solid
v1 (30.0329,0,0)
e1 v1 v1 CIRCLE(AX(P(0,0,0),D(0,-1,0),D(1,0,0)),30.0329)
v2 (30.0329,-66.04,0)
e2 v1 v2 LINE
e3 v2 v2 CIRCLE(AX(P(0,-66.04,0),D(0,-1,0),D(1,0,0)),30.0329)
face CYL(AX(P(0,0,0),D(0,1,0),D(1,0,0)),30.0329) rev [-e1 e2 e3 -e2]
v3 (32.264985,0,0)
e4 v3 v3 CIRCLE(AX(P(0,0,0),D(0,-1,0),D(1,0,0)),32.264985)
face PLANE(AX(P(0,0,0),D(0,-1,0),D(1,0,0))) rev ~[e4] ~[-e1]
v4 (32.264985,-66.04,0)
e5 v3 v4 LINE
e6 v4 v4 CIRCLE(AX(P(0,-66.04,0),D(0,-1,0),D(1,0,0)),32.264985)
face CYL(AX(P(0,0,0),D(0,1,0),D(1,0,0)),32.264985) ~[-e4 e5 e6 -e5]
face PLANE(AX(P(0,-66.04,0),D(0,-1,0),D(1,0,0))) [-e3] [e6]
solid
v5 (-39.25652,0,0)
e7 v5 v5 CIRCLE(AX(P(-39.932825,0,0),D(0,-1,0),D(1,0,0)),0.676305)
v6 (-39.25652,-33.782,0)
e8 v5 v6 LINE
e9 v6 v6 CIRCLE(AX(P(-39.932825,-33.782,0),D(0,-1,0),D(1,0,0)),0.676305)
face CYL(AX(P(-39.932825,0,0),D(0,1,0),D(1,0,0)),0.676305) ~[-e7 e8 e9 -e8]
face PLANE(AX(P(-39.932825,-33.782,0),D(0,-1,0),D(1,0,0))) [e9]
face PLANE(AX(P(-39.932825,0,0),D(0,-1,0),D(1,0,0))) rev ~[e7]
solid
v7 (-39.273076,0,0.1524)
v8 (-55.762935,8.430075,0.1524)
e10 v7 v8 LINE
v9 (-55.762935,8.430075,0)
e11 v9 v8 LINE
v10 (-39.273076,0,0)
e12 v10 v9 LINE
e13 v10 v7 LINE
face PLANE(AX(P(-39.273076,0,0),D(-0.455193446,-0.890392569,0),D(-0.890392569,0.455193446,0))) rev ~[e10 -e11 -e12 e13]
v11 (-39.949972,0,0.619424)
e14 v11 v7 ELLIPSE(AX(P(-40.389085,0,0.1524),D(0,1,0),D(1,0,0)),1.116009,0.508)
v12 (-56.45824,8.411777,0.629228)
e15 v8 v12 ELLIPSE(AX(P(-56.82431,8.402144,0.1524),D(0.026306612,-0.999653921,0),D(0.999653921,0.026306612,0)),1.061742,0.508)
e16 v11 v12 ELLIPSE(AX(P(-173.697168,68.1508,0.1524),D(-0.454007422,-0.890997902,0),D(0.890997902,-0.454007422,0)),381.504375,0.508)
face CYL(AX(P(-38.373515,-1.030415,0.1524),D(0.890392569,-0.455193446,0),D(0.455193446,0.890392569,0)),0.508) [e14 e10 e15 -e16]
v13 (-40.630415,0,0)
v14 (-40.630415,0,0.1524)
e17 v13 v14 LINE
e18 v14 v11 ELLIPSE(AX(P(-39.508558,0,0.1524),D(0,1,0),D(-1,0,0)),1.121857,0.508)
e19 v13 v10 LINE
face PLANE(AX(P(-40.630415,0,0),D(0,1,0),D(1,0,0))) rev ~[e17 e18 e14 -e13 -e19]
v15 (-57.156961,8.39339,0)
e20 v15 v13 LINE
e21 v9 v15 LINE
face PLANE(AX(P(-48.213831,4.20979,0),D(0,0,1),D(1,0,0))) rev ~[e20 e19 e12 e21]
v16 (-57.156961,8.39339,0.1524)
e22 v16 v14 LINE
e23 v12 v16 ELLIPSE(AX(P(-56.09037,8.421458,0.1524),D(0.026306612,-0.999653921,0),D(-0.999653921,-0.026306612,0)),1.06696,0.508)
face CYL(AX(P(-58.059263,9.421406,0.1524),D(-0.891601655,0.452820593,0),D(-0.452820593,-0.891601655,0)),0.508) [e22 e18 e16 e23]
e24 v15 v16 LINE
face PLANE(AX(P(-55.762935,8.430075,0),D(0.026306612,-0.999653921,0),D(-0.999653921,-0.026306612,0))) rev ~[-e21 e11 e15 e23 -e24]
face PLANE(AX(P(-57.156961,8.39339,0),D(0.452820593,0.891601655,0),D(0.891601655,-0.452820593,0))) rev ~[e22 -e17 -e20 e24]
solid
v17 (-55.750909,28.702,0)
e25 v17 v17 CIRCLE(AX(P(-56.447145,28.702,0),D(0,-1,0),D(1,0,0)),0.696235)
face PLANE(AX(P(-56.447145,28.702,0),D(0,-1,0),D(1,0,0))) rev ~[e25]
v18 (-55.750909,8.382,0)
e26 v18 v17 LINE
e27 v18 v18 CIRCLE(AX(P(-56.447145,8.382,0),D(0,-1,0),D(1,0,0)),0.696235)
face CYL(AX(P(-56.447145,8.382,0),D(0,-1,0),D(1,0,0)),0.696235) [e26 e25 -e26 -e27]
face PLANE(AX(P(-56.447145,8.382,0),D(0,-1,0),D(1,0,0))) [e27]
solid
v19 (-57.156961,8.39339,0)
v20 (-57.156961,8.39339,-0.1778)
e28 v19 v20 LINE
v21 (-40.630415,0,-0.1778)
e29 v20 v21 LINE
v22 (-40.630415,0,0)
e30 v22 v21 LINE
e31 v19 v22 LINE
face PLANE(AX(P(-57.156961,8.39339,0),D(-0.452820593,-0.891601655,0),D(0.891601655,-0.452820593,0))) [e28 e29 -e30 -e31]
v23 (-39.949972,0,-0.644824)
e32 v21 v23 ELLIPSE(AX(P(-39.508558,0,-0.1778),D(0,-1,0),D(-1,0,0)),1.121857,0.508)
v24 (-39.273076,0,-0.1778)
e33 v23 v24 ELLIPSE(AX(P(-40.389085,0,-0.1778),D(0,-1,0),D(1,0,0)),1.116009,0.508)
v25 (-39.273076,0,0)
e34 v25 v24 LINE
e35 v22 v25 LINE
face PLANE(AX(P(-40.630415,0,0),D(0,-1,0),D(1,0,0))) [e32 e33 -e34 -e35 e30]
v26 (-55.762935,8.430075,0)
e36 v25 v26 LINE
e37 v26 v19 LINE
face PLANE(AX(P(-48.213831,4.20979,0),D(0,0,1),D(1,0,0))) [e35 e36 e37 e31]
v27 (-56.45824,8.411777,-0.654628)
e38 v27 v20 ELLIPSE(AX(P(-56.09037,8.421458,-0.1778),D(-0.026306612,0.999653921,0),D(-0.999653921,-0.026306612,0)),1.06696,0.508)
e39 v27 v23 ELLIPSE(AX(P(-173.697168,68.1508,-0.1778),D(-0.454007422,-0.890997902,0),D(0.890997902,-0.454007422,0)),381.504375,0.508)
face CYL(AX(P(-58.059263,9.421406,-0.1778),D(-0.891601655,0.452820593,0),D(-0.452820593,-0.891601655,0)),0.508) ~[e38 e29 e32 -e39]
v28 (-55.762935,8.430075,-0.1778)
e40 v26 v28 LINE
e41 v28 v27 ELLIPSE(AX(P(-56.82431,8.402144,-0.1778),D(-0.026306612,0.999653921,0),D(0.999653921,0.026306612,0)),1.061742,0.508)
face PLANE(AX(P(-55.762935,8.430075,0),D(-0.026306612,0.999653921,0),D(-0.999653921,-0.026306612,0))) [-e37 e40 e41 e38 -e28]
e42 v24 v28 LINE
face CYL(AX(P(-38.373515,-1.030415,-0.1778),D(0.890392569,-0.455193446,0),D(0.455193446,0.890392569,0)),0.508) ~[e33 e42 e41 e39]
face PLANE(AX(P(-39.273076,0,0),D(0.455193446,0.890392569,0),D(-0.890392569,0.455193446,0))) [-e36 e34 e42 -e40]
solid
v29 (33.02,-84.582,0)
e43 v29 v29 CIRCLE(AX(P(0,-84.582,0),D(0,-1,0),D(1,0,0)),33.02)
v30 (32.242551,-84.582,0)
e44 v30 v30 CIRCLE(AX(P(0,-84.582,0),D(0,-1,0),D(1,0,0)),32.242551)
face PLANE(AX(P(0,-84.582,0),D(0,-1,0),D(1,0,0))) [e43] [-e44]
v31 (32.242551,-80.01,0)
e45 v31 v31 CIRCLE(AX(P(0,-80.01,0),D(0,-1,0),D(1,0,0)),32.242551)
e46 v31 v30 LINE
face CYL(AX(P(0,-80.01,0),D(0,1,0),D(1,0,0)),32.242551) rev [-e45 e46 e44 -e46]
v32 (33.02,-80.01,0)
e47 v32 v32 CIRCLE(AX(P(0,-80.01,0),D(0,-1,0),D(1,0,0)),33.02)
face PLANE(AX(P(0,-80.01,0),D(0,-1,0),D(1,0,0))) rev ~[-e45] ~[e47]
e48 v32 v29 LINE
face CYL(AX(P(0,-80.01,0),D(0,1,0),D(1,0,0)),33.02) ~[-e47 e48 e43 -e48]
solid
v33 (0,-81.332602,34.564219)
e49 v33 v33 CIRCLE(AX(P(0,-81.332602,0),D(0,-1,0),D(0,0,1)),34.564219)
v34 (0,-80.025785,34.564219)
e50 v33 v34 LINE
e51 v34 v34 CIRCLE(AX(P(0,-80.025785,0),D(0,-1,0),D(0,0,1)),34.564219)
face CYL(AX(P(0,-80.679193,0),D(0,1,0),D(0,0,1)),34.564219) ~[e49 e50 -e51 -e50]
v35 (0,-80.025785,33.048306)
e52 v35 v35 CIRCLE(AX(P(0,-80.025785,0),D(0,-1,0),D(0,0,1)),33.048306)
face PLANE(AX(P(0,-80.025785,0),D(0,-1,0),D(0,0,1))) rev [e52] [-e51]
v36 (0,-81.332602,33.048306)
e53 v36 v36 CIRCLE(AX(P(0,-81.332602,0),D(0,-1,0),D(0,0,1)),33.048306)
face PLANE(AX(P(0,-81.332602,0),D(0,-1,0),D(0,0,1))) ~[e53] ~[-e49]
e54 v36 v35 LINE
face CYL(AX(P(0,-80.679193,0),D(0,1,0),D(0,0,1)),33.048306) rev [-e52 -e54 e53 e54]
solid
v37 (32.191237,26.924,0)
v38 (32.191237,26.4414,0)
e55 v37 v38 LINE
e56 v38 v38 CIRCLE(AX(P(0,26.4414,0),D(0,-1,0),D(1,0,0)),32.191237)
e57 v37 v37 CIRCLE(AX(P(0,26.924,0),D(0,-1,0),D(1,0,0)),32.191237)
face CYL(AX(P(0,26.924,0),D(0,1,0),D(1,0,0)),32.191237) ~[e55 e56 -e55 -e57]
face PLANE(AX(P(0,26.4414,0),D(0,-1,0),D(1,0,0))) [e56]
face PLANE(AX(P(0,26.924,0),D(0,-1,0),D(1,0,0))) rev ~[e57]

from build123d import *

# Parameters (mm, degrees)
F0_R           = 32.2649845467
F0_R_2         = 30.0329002684
F1_DEPTH       = 66.04
F3_R           = 33.02
F3_R_2         = 32.2425514632
F4_DEPTH       = 4.572
F5_W           = 1.3068169355
F5_H           = 1.5159137547
F9_R           = 32.1912372863
F10_DEPTH      = 0.4826
F11_R          = 0.6763051709
F12_DEPTH      = 33.782
F14_R          = 0.6962354259
F15_DEPTH      = 20.32
F17_DEPTH      = 0.6604
F18_DEPTH      = 0.6858
F19_T1_DEPTH   = 21.0597633564
F19_T3_DEPTH   = 21.0757959369
F19_2_T1_DEPTH = 21.0597633564
F19_2_T3_DEPTH = 21.0757959369


# Not quite as in the source:
# - a fillet or chamfer that OpenCascade refuses, or shapes differently, is made with other operations: its cross-section is extruded or revolved along the edge and cut away or added


with BuildPart() as f1:
    # F0 (on Front) → F1 (new body)
    with BuildSketch(Plane.XZ):
        Circle(F0_R)
        Circle(F0_R_2, mode=Mode.SUBTRACT)
    extrude(amount=F1_DEPTH)


with BuildPart() as f4:
    # F3 (on offset) → F4 (new body)
    with BuildSketch(Plane.XZ.offset(80.01)):
        Circle(F3_R)
        Circle(F3_R_2, mode=Mode.SUBTRACT)
    extrude(amount=F4_DEPTH)


with BuildPart() as f7:
    # F5 (on Right) → F7 (revolve)
    with BuildSketch(Plane.YZ):
        with Locations((-80.6791931391, 33.8062625378)):
            Rectangle(F5_W, F5_H)
    revolve(axis=Axis((0, -220.3602194786, 0), (0, -1, 0)))


with BuildPart() as f10:
    # F9 (on offset) → F10 (new body)
    with BuildSketch(Plane.XZ.offset(-26.924)):
        Circle(F9_R)
    extrude(amount=F10_DEPTH)


with BuildPart() as f12:
    # F11 (on Front) → F12 (new body)
    with BuildSketch(Plane.XZ):
        with Locations((-39.9328246713, 0)):
            Circle(F11_R)
    extrude(amount=F12_DEPTH)


with BuildPart() as f15:
    # F14 (on offset) → F15 (new body)
    with BuildSketch(Plane.XZ.offset(-8.382)):
        with Locations((-56.4471445978, 0)):
            Circle(F14_R)
    extrude(amount=-F15_DEPTH)


with BuildPart() as f17:
    # F16 (on Top) → F17 (new body)
    with BuildSketch(Plane.XY):
        Polygon((-39.2730757594, 0), (-55.7629354298, 8.4300749004), (-57.1569614112, 8.3933901042), (-40.630415082, 0), align=None)
    extrude(amount=F17_DEPTH)


with BuildPart() as f18:
    # F18 (new): a face of the model
    f18_faces = [f17.part.faces().sort_by_distance(p)[0] for p in [
        (-48.3112762863, 4.2598390002, 0),
    ]]
    extrude(f18_faces, amount=F18_DEPTH)

    # F19: fillet of radius 0.508 on 2 edges, made by hand

    # F19_s2 → F19_t1 (cut)
    with BuildSketch(Plane(origin=(-30.0048537502, 15.3393157701, 0), x_dir=(0, 0, 1), z_dir=(-0.8903925689, 0.455193446, 0))):
        with BuildLine():
            ThreePointArc((-0.1778, -17.876846688), (-0.5370102448, -18.0256364432), (-0.6858, -18.384846688))
            Line((-0.6858, -18.384846688), (-0.6858, -17.876846688))
            Line((-0.6858, -17.876846688), (-0.1778, -17.876846688))
        make_face()
    extrude(amount=F19_T1_DEPTH, mode=Mode.SUBTRACT)

    # F19_s4 → F19_t3 (cut)
    with BuildSketch(Plane(origin=(-49.9581715428, 25.3724168557, 0), x_dir=(0, 0, 1), z_dir=(0.8916016547, -0.4528205928, 0))):
        with BuildLine():
            ThreePointArc((-0.1778, 18.3982886432), (-0.5370102448, 18.249498888), (-0.6858, 17.8902886432))
            Line((-0.6858, 17.8902886432), (-0.6858, 18.3982886432))
            Line((-0.6858, 18.3982886432), (-0.1778, 18.3982886432))
        make_face()
    extrude(amount=F19_T3_DEPTH, mode=Mode.SUBTRACT)


with BuildPart() as f17_1:
    add(f17.part)

    # F19#2: fillet of radius 0.508 on 2 edges, made by hand

    # F19_2_s2 → F19_2_t1 (cut)
    with BuildSketch(Plane(origin=(-30.0048537502, 15.3393157701, 0), x_dir=(0, 0, 1), z_dir=(-0.8903925689, 0.455193446, 0))):
        with BuildLine():
            ThreePointArc((0.1524, -17.876846688), (0.5116102448, -18.0256364432), (0.6604, -18.384846688))
            Line((0.6604, -18.384846688), (0.6604, -17.876846688))
            Line((0.6604, -17.876846688), (0.1524, -17.876846688))
        make_face()
    extrude(amount=F19_2_T1_DEPTH, mode=Mode.SUBTRACT)

    # F19_2_s4 → F19_2_t3 (cut)
    with BuildSketch(Plane(origin=(-49.9581715428, 25.3724168557, 0), x_dir=(0, 0, 1), z_dir=(0.8916016547, -0.4528205928, 0))):
        with BuildLine():
            ThreePointArc((0.1524, 18.3982886432), (0.5116102448, 18.249498888), (0.6604, 17.8902886432))
            Line((0.6604, 17.8902886432), (0.6604, 18.3982886432))
            Line((0.6604, 18.3982886432), (0.1524, 18.3982886432))
        make_face()
    extrude(amount=F19_2_T3_DEPTH, mode=Mode.SUBTRACT)


solid = Compound([f1.part, f4.part, f7.part, f10.part, f12.part, f15.part, f18.part, f17_1.part])
